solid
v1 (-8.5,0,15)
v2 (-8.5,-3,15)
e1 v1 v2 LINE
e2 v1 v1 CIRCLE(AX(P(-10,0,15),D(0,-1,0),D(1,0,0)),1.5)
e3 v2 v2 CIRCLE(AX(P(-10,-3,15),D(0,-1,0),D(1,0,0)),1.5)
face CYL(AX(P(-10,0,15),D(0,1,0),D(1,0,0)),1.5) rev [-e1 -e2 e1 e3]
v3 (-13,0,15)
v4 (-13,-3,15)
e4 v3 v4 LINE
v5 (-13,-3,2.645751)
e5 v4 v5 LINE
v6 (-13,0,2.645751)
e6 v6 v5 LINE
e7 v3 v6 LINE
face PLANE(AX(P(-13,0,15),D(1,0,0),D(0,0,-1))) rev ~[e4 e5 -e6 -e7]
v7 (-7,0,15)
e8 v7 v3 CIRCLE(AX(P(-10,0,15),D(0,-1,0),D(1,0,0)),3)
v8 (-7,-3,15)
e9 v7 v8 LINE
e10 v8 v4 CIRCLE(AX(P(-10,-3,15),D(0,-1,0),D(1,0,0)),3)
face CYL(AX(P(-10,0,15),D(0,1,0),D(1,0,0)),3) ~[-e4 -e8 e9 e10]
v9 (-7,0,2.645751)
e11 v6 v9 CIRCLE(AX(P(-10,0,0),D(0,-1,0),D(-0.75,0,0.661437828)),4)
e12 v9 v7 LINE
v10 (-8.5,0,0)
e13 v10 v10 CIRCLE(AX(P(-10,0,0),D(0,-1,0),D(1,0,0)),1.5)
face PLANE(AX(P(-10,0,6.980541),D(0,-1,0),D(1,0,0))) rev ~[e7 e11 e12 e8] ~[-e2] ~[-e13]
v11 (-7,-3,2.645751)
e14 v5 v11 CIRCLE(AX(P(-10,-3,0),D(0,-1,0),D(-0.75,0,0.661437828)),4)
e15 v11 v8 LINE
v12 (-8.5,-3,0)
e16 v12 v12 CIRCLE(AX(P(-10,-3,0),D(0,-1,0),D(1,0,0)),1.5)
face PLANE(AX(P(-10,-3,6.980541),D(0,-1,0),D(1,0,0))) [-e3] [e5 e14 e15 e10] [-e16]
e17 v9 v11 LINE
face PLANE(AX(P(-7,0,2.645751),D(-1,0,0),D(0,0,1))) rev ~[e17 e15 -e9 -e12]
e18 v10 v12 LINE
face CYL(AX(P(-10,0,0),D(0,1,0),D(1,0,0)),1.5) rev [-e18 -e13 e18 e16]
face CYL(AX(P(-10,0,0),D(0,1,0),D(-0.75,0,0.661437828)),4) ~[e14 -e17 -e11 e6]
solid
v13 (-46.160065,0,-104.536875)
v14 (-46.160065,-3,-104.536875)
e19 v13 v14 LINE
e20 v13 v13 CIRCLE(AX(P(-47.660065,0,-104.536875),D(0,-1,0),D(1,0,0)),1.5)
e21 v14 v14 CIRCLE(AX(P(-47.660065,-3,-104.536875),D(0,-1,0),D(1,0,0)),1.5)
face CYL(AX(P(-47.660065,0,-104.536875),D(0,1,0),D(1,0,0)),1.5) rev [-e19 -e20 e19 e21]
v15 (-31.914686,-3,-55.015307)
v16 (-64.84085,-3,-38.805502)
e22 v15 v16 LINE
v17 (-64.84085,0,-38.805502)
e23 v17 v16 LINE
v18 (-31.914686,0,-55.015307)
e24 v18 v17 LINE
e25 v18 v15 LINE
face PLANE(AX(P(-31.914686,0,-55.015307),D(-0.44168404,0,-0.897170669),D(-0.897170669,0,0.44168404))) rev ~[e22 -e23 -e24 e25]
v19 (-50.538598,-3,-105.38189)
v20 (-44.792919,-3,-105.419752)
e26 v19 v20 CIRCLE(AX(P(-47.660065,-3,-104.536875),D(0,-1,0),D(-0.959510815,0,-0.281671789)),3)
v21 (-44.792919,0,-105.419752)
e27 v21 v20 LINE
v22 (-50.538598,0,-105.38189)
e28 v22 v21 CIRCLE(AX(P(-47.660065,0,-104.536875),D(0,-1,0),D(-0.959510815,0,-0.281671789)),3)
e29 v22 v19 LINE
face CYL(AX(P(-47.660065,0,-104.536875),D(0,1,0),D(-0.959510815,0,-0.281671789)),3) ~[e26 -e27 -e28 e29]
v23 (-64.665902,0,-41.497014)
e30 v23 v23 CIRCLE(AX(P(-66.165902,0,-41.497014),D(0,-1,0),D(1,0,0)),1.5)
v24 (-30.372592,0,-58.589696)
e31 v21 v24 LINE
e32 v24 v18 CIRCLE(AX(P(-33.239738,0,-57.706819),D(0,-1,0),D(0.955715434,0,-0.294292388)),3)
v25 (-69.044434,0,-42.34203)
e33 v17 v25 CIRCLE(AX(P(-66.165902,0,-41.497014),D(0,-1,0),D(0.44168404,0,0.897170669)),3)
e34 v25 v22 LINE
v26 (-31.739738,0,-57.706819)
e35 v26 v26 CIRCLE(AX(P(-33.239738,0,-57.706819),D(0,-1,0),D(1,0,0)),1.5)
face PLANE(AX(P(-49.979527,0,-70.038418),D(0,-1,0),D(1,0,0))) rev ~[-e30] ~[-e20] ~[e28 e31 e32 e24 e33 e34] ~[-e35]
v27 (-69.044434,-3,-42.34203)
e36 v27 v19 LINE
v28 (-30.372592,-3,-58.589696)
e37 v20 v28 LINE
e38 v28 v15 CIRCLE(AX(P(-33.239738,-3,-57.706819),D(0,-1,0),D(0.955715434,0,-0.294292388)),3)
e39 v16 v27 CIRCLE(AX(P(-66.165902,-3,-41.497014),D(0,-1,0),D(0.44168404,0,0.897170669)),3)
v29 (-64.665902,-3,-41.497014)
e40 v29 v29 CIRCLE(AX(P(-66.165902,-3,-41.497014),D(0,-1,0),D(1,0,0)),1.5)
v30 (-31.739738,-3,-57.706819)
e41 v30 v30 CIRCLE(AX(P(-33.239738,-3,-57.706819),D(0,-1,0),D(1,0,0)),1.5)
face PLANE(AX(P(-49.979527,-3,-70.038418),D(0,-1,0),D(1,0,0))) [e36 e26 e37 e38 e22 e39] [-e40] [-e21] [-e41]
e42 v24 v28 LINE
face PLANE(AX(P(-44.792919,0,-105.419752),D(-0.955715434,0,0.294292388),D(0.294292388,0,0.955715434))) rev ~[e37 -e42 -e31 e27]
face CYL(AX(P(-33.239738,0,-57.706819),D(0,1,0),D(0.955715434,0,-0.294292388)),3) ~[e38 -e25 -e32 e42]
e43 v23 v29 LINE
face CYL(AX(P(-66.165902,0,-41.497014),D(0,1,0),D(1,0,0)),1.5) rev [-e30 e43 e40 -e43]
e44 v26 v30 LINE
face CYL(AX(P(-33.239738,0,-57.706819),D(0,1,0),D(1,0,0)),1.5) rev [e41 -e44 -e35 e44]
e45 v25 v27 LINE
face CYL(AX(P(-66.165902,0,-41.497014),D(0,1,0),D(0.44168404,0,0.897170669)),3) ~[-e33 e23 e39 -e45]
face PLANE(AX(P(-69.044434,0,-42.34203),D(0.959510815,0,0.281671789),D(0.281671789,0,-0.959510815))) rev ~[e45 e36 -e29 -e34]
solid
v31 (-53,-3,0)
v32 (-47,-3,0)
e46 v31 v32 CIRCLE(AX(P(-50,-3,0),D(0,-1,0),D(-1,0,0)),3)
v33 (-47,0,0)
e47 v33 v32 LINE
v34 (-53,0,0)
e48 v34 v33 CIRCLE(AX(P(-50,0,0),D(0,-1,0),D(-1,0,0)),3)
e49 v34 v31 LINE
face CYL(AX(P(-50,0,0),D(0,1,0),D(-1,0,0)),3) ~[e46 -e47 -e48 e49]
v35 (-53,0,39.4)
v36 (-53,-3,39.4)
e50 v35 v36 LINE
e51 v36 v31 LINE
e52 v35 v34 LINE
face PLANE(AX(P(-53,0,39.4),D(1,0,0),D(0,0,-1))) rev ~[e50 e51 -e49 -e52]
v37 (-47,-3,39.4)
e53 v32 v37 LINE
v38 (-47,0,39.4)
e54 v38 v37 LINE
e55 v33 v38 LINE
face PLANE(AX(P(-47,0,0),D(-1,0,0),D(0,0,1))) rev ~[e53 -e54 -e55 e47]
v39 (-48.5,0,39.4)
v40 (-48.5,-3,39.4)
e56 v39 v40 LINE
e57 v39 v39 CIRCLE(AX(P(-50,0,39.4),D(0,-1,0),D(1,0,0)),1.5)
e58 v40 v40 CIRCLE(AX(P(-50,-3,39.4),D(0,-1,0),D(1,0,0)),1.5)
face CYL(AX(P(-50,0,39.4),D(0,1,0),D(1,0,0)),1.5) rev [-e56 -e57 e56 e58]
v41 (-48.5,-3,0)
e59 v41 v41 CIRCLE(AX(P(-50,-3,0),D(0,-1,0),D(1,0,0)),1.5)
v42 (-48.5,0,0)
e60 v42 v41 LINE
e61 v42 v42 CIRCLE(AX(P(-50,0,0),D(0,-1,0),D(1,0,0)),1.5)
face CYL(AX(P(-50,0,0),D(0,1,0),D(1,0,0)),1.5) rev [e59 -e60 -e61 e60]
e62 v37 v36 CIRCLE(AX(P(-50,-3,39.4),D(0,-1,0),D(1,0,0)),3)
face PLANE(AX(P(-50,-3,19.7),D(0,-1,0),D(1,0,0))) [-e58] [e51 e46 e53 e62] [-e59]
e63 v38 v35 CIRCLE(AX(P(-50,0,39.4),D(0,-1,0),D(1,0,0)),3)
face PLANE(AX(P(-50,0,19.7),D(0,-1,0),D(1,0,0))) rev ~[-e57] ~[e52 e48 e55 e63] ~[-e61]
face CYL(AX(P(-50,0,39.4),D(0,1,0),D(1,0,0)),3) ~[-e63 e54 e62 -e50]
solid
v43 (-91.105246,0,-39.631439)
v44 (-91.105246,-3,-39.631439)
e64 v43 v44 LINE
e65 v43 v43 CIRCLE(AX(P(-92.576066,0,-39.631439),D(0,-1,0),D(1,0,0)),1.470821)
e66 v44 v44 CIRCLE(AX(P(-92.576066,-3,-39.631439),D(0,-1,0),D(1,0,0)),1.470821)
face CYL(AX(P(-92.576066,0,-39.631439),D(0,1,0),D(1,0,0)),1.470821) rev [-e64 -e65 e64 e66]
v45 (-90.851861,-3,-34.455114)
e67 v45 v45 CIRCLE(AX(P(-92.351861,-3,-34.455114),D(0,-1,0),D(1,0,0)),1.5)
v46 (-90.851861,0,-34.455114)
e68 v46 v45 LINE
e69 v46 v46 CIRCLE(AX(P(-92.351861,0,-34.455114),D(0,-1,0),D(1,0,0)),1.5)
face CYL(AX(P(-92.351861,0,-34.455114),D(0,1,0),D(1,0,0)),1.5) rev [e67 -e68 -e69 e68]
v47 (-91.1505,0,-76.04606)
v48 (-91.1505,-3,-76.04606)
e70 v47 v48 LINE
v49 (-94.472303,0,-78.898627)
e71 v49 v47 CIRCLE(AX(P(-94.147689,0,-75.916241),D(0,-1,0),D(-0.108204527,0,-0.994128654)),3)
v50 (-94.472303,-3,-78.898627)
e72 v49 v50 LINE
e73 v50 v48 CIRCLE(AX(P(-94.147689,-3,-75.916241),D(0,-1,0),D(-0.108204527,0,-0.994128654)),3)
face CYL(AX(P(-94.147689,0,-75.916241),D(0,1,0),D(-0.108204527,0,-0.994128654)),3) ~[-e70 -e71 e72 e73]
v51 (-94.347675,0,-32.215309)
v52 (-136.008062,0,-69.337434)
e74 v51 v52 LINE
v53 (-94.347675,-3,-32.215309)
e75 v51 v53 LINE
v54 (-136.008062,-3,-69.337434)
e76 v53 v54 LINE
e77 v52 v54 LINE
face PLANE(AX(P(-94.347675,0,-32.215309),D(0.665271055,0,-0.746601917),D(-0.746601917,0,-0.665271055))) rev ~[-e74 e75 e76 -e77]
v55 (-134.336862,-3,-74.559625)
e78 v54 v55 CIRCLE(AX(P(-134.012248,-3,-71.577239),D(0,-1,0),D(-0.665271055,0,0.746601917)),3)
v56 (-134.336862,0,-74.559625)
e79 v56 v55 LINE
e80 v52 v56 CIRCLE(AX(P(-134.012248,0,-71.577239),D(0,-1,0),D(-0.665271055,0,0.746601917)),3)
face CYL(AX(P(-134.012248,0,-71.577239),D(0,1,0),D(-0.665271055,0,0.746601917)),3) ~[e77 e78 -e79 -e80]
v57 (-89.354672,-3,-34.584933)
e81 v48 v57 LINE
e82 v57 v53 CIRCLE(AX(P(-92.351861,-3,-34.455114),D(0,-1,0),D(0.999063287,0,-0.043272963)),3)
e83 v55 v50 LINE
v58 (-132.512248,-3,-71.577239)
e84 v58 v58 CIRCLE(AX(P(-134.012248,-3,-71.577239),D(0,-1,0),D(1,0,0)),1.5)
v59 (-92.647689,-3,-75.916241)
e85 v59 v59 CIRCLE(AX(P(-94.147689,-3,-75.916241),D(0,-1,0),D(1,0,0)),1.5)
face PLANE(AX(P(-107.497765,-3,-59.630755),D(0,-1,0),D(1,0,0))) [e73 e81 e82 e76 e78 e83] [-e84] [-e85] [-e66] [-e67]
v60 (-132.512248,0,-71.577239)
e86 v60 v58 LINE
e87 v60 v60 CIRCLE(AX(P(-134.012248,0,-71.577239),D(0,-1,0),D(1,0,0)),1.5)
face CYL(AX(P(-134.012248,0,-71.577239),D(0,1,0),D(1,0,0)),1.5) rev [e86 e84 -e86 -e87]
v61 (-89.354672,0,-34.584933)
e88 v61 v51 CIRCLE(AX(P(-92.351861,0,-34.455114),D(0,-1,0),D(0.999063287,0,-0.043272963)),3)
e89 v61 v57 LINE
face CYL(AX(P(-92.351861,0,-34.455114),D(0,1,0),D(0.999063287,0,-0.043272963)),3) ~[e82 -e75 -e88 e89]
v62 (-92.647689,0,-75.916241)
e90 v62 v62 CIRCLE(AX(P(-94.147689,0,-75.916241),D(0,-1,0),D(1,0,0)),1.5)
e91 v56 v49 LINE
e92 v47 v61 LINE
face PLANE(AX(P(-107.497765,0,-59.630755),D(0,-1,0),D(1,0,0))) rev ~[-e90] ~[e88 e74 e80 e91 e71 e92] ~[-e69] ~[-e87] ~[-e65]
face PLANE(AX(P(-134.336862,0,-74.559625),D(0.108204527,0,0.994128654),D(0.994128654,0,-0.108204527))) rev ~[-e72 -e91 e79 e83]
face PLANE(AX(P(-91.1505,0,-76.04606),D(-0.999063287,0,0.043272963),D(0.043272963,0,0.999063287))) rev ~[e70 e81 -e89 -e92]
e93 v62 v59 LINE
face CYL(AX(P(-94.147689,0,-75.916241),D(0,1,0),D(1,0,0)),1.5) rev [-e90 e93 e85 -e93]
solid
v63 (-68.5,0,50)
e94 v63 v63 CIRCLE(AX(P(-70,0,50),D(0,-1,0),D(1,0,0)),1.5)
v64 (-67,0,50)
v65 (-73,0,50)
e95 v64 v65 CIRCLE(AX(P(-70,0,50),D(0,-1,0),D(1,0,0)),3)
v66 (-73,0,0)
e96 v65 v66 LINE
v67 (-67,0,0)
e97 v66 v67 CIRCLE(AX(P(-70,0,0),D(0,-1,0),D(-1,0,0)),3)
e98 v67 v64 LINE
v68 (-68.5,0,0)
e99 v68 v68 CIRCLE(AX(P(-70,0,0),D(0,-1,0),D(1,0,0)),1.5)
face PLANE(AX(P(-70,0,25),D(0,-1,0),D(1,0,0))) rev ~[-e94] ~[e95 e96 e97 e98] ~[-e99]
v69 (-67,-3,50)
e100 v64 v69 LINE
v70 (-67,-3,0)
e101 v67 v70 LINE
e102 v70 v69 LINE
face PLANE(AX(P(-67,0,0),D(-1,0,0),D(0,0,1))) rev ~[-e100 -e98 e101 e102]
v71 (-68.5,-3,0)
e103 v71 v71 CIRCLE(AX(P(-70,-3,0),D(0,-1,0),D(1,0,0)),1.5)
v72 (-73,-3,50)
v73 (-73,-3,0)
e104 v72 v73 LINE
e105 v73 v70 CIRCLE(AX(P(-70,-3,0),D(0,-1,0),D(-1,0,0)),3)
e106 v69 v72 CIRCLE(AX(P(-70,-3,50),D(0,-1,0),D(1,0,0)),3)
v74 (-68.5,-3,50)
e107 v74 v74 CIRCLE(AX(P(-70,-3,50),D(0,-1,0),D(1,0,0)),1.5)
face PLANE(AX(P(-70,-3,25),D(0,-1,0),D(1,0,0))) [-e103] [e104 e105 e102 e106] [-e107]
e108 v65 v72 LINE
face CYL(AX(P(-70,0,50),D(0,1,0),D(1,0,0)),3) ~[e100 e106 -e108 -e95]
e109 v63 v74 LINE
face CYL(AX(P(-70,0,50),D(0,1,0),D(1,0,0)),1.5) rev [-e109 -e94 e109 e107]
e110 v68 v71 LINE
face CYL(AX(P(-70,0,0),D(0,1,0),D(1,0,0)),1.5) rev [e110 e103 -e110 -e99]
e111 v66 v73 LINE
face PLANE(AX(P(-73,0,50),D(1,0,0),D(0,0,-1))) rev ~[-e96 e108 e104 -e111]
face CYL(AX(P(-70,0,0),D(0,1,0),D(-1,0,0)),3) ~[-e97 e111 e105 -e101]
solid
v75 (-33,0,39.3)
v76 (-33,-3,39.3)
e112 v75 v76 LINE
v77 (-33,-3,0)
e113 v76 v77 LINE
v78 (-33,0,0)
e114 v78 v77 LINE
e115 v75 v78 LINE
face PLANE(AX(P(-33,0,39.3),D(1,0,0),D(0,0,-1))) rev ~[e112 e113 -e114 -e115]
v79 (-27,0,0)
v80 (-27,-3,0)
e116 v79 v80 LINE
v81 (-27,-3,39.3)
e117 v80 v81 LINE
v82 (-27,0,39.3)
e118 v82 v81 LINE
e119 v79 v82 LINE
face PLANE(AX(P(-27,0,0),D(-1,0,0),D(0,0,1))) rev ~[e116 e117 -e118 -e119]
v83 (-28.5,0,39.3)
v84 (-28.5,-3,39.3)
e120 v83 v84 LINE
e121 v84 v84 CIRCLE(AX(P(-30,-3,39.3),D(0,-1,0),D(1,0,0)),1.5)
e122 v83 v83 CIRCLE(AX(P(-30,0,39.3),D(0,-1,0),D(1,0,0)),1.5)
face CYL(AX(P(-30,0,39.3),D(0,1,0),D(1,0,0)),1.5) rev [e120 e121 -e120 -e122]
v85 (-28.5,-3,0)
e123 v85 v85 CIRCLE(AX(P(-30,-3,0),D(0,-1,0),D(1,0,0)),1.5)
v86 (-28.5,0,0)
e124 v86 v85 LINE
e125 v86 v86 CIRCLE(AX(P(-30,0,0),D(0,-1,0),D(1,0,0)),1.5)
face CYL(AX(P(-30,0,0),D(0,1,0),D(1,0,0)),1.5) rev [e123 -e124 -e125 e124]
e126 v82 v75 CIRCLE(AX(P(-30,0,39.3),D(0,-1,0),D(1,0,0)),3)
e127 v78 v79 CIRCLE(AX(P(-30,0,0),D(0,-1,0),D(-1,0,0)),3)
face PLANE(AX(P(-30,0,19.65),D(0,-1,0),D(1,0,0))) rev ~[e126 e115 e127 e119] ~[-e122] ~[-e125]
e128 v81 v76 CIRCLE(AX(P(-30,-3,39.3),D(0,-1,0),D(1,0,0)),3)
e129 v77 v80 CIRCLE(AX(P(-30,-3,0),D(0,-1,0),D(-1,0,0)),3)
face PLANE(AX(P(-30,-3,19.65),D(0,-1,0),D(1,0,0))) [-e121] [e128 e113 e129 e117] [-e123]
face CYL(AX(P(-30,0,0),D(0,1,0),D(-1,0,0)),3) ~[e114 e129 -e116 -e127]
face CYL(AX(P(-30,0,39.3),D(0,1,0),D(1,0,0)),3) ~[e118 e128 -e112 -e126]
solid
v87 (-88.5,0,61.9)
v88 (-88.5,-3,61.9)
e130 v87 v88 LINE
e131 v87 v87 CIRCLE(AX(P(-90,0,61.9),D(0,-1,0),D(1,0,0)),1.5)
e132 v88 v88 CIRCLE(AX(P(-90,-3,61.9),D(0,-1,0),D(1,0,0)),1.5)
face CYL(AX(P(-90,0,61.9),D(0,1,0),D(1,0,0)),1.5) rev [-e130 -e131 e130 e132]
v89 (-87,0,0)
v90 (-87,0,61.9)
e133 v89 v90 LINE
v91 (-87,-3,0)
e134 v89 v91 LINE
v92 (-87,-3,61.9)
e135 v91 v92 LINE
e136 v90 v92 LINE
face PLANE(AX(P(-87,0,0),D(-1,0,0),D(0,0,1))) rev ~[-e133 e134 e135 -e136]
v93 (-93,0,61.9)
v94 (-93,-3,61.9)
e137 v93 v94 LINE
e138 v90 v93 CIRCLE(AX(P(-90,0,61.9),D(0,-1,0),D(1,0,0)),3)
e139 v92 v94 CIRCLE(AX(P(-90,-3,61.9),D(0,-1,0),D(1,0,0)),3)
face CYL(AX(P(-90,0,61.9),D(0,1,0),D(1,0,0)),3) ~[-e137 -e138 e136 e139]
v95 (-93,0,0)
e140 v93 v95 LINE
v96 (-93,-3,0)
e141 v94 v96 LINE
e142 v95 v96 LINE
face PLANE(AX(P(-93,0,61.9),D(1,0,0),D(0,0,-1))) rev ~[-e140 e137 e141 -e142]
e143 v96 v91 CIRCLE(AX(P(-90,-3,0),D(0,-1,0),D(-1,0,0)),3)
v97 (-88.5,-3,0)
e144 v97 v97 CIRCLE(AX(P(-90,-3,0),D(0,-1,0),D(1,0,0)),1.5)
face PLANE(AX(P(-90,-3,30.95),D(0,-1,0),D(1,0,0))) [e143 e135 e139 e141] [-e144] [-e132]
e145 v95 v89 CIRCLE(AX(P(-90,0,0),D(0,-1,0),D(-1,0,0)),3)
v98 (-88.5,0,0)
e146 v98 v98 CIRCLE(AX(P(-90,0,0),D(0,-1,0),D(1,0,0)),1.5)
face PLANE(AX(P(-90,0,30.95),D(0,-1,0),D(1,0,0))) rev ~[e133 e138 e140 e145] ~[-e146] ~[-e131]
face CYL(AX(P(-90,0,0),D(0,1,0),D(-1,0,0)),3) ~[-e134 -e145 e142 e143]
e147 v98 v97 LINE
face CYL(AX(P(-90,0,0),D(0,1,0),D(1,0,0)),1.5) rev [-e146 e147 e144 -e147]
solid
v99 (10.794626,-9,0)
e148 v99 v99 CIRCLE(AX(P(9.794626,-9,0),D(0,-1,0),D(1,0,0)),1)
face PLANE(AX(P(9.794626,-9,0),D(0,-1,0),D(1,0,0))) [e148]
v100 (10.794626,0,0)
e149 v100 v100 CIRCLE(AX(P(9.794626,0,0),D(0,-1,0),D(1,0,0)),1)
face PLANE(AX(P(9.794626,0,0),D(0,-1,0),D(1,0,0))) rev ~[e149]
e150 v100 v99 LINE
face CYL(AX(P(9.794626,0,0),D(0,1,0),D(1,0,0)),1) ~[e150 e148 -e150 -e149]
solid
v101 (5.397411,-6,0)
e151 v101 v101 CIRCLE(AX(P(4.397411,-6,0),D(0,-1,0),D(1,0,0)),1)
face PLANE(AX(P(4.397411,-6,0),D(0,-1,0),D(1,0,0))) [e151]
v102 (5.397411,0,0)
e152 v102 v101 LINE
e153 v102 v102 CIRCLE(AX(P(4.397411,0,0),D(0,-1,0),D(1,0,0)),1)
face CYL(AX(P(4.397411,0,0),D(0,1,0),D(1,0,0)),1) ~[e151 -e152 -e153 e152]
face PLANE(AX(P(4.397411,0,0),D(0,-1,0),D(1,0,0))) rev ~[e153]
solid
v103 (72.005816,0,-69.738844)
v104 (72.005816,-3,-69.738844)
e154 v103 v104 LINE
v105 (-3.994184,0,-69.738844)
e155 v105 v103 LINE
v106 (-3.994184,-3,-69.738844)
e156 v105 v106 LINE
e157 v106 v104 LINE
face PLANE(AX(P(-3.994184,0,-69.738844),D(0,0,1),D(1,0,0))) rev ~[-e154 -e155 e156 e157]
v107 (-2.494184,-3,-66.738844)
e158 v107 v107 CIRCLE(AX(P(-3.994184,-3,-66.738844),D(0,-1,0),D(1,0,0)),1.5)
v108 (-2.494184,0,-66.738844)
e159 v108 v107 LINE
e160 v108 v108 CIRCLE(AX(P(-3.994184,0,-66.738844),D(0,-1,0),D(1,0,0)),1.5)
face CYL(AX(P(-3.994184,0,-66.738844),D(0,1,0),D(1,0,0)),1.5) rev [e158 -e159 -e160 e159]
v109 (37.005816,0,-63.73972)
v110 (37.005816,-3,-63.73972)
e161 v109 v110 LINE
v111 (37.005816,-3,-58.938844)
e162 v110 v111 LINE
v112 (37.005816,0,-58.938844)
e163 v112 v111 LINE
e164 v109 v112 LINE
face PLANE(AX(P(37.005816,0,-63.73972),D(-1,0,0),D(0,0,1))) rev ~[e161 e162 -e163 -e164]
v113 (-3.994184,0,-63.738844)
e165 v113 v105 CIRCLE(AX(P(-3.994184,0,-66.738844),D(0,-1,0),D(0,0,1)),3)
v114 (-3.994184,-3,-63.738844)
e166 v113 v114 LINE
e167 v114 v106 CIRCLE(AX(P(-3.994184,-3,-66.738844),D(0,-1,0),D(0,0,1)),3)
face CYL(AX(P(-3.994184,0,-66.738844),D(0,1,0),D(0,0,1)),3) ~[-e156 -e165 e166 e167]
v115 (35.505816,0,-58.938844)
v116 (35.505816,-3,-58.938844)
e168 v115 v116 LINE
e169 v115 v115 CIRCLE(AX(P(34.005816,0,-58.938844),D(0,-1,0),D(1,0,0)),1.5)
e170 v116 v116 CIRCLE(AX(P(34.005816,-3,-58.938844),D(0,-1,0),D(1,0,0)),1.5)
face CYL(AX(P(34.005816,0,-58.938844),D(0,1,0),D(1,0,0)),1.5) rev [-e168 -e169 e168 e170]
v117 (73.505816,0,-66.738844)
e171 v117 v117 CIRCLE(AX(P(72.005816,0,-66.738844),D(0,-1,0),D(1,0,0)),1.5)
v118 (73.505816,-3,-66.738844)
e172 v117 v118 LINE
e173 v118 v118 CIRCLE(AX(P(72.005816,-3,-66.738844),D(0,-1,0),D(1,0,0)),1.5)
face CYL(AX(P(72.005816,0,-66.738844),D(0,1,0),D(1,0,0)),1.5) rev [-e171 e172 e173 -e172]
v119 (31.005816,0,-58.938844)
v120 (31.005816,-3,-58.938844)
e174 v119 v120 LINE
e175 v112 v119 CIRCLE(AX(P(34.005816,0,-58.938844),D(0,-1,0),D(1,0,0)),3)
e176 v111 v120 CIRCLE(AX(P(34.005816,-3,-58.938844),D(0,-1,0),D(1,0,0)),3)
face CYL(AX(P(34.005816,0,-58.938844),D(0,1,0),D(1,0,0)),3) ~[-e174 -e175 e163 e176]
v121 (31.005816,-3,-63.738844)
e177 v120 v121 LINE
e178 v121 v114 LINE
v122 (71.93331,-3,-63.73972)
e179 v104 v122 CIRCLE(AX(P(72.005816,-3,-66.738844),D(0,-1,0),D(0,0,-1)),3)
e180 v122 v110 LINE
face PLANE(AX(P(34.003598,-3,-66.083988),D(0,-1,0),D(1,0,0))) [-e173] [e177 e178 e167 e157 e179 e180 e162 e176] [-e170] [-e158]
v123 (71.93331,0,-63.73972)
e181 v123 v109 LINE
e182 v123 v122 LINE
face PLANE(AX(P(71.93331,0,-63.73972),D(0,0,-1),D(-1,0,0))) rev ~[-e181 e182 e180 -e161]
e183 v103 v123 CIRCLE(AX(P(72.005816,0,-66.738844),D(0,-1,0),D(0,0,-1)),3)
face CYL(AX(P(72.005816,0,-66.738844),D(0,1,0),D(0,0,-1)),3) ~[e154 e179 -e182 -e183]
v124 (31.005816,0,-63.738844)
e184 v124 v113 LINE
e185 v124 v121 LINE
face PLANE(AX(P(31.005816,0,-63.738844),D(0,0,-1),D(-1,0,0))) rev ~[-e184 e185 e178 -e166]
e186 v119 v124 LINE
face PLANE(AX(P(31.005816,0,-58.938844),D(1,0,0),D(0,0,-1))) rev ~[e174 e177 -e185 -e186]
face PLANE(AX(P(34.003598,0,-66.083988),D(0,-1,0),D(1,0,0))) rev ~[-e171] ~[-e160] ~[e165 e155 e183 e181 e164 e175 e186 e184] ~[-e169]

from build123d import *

# Parameters (mm, degrees)
F0_R     = 1.5
F0_R_2   = 1.4708207519
F2_DEPTH = 3
F3_R     = 1
F4_DEPTH = 6
F5_DEPTH = 9


# Not quite as in the source:
# - a feature names something its author has since deleted; it is built from what else it names


with BuildPart() as f2:
    # F0 (on Front) → F2 (new body)
    with BuildSketch(Plane.XZ):
        with BuildLine():
            Line((-91.1504995372, -76.0460597605), (-89.3546715619, -34.5849333663))
            ThreePointArc((-89.3546715619, -34.5849333663), (-91.065599762, -31.7448504778), (-94.3476745872, -32.2153087241))
            Line((-94.3476745872, -32.2153087241), (-136.0080615822, -69.3374336016))
            ThreePointArc((-136.0080615822, -69.3374336016), (-136.8695052558, -72.4916152918), (-134.3368619965, -74.5596253156))
            Line((-134.3368619965, -74.5596253156), (-94.4723029768, -78.8986268323))
            ThreePointArc((-94.4723029768, -78.8986268323), (-92.1932199759, -78.1922130327), (-91.1504995372, -76.0460597605))
        make_face()
        with Locations((-134.0122484167, -71.577239354)):
            Circle(F0_R, mode=Mode.SUBTRACT)
        with Locations((-94.147689397, -75.9162408708)):
            Circle(F0_R, mode=Mode.SUBTRACT)
        with Locations((-92.5760663301, -39.6314388091)):
            Circle(F0_R_2, mode=Mode.SUBTRACT)
        with Locations((-92.3518614217, -34.4551144765)):
            Circle(F0_R, mode=Mode.SUBTRACT)
    extrude(amount=F2_DEPTH)


with BuildPart() as f2b:
    # F0 (on Front) → F2, piece 2 (new body)
    with BuildSketch(Plane.XZ):
        with BuildLine():
            Line((-31.9146860603, -55.0153067294), (-64.8408496002, -38.805502457))
            ThreePointArc((-64.8408496002, -38.805502457), (-68.0972436742, -39.2013842101), (-69.0444341645, -42.342029829))
            Line((-69.0444341645, -42.342029829), (-50.538597649, -105.3818903528))
            ThreePointArc((-50.538597649, -105.3818903528), (-47.6798336145, -107.5368098544), (-44.7929189039, -105.4197521515))
            Line((-44.7929189039, -105.4197521515), (-30.3725918796, -58.5896959001))
            ThreePointArc((-30.3725918796, -58.5896959001), (-30.4851608289, -56.5184149265), (-31.9146860603, -55.0153067294))
        make_face()
        with Locations((-47.660065205, -104.5368749868)):
            Circle(F0_R, mode=Mode.SUBTRACT)
        with Locations((-33.2397381807, -57.7068187353)):
            Circle(F0_R, mode=Mode.SUBTRACT)
        with Locations((-66.1659017205, -41.4970144629)):
            Circle(F0_R, mode=Mode.SUBTRACT)
    extrude(amount=F2_DEPTH)


with BuildPart() as f2c:
    # F0 (on Front) → F2, piece 3 (new body)
    with BuildSketch(Plane.XZ):
        with BuildLine():
            Line((-93, 61.9), (-93, 0))
            ThreePointArc((-93, 0), (-90, -3), (-87, 0))
            Line((-87, 0), (-87, 61.9))
            ThreePointArc((-87, 61.9), (-90, 64.9), (-93, 61.9))
        make_face()
        with Locations((-90, 0)):
            Circle(F0_R, mode=Mode.SUBTRACT)
        with Locations((-90, 61.9)):
            Circle(F0_R, mode=Mode.SUBTRACT)
    extrude(amount=F2_DEPTH)


with BuildPart() as f2d:
    # F0 (on Front) → F2, piece 4 (new body)
    with BuildSketch(Plane.XZ):
        with BuildLine():
            Line((-73, 50), (-73, 0))
            ThreePointArc((-73, 0), (-70, -3), (-67, 0))
            Line((-67, 0), (-67, 50))
            ThreePointArc((-67, 50), (-70, 53), (-73, 50))
        make_face()
        with Locations((-70, 0)):
            Circle(F0_R, mode=Mode.SUBTRACT)
        with Locations((-70, 50)):
            Circle(F0_R, mode=Mode.SUBTRACT)
    extrude(amount=F2_DEPTH)


with BuildPart() as f2e:
    # F0 (on Front) → F2, piece 5 (new body)
    with BuildSketch(Plane.XZ):
        with BuildLine():
            Line((-53, 39.4), (-53, 0))
            ThreePointArc((-53, 0), (-50, -3), (-47, 0))
            Line((-47, 0), (-47, 39.4))
            ThreePointArc((-47, 39.4), (-50, 42.4), (-53, 39.4))
        make_face()
        with Locations((-50, 0)):
            Circle(F0_R, mode=Mode.SUBTRACT)
        with Locations((-50, 39.4)):
            Circle(F0_R, mode=Mode.SUBTRACT)
    extrude(amount=F2_DEPTH)


with BuildPart() as f2f:
    # F0 (on Front) → F2, piece 6 (new body)
    with BuildSketch(Plane.XZ):
        with BuildLine():
            Line((-33, 39.3), (-33, 0))
            ThreePointArc((-33, 0), (-30, -3), (-27, 0))
            Line((-27, 0), (-27, 39.3))
            ThreePointArc((-27, 39.3), (-30, 42.3), (-33, 39.3))
        make_face()
        with Locations((-30, 0)):
            Circle(F0_R, mode=Mode.SUBTRACT)
        with Locations((-30, 39.3)):
            Circle(F0_R, mode=Mode.SUBTRACT)
    extrude(amount=F2_DEPTH)


with BuildPart() as f2g:
    # F0 (on Front) → F2, piece 7 (new body)
    with BuildSketch(Plane.XZ):
        with BuildLine():
            Line((31.0058163851, -63.7388439178), (-3.9941836149, -63.7388439178))
            ThreePointArc((-3.9941836149, -63.7388439178), (-6.9941836149, -66.7388439178), (-3.9941836149, -69.7388439178))
            Line((-3.9941836149, -69.7388439178), (72.0058163851, -69.7388439178))
            ThreePointArc((72.0058163851, -69.7388439178), (75.0055972977, -66.7025882054), (71.9333102557, -63.7397202356))
            Line((71.9333102557, -63.7397202356), (37.0058163851, -63.7397202356))
            Line((37.0058163851, -63.7397202356), (37.0058163851, -58.9388439178))
            ThreePointArc((37.0058163851, -58.9388439178), (34.0058163851, -55.9388439178), (31.0058163851, -58.9388439178))
            Line((31.0058163851, -58.9388439178), (31.0058163851, -63.7388439178))
        make_face()
        with Locations((-3.9941836149, -66.7388439178)):
            Circle(F0_R, mode=Mode.SUBTRACT)
        with Locations((72.0058163851, -66.7388439178)):
            Circle(F0_R, mode=Mode.SUBTRACT)
        with Locations((34.0058163851, -58.9388439178)):
            Circle(F0_R, mode=Mode.SUBTRACT)
    extrude(amount=F2_DEPTH)


with BuildPart() as f2h:
    # F0 (on Front) → F2, piece 8 (new body)
    with BuildSketch(Plane.XZ):
        with BuildLine():
            Line((-7, 2.6457513111), (-7, 15))
            ThreePointArc((-7, 15), (-10, 18), (-13, 15))
            Line((-13, 15), (-13, 2.6457513111))
            ThreePointArc((-13, 2.6457513111), (-10, -4), (-7, 2.6457513111))
        make_face()
        with Locations((-10, 0)):
            Circle(F0_R, mode=Mode.SUBTRACT)
        with Locations((-10, 15)):
            Circle(F0_R, mode=Mode.SUBTRACT)
    extrude(amount=F2_DEPTH)


with BuildPart() as f4:
    # F3 (on Front) → F4 (new body)
    with BuildSketch(Plane.XZ):
        with Locations((4.3974108437, 0)):
            Circle(F3_R)
    extrude(amount=F4_DEPTH)


with BuildPart() as f5:
    # F3 (on Front) → F5 (new body)
    with BuildSketch(Plane.XZ):
        with Locations((9.7946263296, 0)):
            Circle(F3_R)
    extrude(amount=F5_DEPTH)


solid = Compound([f2.part, f2b.part, f2c.part, f2d.part, f2e.part, f2f.part, f2g.part, f2h.part, f4.part, f5.part])
